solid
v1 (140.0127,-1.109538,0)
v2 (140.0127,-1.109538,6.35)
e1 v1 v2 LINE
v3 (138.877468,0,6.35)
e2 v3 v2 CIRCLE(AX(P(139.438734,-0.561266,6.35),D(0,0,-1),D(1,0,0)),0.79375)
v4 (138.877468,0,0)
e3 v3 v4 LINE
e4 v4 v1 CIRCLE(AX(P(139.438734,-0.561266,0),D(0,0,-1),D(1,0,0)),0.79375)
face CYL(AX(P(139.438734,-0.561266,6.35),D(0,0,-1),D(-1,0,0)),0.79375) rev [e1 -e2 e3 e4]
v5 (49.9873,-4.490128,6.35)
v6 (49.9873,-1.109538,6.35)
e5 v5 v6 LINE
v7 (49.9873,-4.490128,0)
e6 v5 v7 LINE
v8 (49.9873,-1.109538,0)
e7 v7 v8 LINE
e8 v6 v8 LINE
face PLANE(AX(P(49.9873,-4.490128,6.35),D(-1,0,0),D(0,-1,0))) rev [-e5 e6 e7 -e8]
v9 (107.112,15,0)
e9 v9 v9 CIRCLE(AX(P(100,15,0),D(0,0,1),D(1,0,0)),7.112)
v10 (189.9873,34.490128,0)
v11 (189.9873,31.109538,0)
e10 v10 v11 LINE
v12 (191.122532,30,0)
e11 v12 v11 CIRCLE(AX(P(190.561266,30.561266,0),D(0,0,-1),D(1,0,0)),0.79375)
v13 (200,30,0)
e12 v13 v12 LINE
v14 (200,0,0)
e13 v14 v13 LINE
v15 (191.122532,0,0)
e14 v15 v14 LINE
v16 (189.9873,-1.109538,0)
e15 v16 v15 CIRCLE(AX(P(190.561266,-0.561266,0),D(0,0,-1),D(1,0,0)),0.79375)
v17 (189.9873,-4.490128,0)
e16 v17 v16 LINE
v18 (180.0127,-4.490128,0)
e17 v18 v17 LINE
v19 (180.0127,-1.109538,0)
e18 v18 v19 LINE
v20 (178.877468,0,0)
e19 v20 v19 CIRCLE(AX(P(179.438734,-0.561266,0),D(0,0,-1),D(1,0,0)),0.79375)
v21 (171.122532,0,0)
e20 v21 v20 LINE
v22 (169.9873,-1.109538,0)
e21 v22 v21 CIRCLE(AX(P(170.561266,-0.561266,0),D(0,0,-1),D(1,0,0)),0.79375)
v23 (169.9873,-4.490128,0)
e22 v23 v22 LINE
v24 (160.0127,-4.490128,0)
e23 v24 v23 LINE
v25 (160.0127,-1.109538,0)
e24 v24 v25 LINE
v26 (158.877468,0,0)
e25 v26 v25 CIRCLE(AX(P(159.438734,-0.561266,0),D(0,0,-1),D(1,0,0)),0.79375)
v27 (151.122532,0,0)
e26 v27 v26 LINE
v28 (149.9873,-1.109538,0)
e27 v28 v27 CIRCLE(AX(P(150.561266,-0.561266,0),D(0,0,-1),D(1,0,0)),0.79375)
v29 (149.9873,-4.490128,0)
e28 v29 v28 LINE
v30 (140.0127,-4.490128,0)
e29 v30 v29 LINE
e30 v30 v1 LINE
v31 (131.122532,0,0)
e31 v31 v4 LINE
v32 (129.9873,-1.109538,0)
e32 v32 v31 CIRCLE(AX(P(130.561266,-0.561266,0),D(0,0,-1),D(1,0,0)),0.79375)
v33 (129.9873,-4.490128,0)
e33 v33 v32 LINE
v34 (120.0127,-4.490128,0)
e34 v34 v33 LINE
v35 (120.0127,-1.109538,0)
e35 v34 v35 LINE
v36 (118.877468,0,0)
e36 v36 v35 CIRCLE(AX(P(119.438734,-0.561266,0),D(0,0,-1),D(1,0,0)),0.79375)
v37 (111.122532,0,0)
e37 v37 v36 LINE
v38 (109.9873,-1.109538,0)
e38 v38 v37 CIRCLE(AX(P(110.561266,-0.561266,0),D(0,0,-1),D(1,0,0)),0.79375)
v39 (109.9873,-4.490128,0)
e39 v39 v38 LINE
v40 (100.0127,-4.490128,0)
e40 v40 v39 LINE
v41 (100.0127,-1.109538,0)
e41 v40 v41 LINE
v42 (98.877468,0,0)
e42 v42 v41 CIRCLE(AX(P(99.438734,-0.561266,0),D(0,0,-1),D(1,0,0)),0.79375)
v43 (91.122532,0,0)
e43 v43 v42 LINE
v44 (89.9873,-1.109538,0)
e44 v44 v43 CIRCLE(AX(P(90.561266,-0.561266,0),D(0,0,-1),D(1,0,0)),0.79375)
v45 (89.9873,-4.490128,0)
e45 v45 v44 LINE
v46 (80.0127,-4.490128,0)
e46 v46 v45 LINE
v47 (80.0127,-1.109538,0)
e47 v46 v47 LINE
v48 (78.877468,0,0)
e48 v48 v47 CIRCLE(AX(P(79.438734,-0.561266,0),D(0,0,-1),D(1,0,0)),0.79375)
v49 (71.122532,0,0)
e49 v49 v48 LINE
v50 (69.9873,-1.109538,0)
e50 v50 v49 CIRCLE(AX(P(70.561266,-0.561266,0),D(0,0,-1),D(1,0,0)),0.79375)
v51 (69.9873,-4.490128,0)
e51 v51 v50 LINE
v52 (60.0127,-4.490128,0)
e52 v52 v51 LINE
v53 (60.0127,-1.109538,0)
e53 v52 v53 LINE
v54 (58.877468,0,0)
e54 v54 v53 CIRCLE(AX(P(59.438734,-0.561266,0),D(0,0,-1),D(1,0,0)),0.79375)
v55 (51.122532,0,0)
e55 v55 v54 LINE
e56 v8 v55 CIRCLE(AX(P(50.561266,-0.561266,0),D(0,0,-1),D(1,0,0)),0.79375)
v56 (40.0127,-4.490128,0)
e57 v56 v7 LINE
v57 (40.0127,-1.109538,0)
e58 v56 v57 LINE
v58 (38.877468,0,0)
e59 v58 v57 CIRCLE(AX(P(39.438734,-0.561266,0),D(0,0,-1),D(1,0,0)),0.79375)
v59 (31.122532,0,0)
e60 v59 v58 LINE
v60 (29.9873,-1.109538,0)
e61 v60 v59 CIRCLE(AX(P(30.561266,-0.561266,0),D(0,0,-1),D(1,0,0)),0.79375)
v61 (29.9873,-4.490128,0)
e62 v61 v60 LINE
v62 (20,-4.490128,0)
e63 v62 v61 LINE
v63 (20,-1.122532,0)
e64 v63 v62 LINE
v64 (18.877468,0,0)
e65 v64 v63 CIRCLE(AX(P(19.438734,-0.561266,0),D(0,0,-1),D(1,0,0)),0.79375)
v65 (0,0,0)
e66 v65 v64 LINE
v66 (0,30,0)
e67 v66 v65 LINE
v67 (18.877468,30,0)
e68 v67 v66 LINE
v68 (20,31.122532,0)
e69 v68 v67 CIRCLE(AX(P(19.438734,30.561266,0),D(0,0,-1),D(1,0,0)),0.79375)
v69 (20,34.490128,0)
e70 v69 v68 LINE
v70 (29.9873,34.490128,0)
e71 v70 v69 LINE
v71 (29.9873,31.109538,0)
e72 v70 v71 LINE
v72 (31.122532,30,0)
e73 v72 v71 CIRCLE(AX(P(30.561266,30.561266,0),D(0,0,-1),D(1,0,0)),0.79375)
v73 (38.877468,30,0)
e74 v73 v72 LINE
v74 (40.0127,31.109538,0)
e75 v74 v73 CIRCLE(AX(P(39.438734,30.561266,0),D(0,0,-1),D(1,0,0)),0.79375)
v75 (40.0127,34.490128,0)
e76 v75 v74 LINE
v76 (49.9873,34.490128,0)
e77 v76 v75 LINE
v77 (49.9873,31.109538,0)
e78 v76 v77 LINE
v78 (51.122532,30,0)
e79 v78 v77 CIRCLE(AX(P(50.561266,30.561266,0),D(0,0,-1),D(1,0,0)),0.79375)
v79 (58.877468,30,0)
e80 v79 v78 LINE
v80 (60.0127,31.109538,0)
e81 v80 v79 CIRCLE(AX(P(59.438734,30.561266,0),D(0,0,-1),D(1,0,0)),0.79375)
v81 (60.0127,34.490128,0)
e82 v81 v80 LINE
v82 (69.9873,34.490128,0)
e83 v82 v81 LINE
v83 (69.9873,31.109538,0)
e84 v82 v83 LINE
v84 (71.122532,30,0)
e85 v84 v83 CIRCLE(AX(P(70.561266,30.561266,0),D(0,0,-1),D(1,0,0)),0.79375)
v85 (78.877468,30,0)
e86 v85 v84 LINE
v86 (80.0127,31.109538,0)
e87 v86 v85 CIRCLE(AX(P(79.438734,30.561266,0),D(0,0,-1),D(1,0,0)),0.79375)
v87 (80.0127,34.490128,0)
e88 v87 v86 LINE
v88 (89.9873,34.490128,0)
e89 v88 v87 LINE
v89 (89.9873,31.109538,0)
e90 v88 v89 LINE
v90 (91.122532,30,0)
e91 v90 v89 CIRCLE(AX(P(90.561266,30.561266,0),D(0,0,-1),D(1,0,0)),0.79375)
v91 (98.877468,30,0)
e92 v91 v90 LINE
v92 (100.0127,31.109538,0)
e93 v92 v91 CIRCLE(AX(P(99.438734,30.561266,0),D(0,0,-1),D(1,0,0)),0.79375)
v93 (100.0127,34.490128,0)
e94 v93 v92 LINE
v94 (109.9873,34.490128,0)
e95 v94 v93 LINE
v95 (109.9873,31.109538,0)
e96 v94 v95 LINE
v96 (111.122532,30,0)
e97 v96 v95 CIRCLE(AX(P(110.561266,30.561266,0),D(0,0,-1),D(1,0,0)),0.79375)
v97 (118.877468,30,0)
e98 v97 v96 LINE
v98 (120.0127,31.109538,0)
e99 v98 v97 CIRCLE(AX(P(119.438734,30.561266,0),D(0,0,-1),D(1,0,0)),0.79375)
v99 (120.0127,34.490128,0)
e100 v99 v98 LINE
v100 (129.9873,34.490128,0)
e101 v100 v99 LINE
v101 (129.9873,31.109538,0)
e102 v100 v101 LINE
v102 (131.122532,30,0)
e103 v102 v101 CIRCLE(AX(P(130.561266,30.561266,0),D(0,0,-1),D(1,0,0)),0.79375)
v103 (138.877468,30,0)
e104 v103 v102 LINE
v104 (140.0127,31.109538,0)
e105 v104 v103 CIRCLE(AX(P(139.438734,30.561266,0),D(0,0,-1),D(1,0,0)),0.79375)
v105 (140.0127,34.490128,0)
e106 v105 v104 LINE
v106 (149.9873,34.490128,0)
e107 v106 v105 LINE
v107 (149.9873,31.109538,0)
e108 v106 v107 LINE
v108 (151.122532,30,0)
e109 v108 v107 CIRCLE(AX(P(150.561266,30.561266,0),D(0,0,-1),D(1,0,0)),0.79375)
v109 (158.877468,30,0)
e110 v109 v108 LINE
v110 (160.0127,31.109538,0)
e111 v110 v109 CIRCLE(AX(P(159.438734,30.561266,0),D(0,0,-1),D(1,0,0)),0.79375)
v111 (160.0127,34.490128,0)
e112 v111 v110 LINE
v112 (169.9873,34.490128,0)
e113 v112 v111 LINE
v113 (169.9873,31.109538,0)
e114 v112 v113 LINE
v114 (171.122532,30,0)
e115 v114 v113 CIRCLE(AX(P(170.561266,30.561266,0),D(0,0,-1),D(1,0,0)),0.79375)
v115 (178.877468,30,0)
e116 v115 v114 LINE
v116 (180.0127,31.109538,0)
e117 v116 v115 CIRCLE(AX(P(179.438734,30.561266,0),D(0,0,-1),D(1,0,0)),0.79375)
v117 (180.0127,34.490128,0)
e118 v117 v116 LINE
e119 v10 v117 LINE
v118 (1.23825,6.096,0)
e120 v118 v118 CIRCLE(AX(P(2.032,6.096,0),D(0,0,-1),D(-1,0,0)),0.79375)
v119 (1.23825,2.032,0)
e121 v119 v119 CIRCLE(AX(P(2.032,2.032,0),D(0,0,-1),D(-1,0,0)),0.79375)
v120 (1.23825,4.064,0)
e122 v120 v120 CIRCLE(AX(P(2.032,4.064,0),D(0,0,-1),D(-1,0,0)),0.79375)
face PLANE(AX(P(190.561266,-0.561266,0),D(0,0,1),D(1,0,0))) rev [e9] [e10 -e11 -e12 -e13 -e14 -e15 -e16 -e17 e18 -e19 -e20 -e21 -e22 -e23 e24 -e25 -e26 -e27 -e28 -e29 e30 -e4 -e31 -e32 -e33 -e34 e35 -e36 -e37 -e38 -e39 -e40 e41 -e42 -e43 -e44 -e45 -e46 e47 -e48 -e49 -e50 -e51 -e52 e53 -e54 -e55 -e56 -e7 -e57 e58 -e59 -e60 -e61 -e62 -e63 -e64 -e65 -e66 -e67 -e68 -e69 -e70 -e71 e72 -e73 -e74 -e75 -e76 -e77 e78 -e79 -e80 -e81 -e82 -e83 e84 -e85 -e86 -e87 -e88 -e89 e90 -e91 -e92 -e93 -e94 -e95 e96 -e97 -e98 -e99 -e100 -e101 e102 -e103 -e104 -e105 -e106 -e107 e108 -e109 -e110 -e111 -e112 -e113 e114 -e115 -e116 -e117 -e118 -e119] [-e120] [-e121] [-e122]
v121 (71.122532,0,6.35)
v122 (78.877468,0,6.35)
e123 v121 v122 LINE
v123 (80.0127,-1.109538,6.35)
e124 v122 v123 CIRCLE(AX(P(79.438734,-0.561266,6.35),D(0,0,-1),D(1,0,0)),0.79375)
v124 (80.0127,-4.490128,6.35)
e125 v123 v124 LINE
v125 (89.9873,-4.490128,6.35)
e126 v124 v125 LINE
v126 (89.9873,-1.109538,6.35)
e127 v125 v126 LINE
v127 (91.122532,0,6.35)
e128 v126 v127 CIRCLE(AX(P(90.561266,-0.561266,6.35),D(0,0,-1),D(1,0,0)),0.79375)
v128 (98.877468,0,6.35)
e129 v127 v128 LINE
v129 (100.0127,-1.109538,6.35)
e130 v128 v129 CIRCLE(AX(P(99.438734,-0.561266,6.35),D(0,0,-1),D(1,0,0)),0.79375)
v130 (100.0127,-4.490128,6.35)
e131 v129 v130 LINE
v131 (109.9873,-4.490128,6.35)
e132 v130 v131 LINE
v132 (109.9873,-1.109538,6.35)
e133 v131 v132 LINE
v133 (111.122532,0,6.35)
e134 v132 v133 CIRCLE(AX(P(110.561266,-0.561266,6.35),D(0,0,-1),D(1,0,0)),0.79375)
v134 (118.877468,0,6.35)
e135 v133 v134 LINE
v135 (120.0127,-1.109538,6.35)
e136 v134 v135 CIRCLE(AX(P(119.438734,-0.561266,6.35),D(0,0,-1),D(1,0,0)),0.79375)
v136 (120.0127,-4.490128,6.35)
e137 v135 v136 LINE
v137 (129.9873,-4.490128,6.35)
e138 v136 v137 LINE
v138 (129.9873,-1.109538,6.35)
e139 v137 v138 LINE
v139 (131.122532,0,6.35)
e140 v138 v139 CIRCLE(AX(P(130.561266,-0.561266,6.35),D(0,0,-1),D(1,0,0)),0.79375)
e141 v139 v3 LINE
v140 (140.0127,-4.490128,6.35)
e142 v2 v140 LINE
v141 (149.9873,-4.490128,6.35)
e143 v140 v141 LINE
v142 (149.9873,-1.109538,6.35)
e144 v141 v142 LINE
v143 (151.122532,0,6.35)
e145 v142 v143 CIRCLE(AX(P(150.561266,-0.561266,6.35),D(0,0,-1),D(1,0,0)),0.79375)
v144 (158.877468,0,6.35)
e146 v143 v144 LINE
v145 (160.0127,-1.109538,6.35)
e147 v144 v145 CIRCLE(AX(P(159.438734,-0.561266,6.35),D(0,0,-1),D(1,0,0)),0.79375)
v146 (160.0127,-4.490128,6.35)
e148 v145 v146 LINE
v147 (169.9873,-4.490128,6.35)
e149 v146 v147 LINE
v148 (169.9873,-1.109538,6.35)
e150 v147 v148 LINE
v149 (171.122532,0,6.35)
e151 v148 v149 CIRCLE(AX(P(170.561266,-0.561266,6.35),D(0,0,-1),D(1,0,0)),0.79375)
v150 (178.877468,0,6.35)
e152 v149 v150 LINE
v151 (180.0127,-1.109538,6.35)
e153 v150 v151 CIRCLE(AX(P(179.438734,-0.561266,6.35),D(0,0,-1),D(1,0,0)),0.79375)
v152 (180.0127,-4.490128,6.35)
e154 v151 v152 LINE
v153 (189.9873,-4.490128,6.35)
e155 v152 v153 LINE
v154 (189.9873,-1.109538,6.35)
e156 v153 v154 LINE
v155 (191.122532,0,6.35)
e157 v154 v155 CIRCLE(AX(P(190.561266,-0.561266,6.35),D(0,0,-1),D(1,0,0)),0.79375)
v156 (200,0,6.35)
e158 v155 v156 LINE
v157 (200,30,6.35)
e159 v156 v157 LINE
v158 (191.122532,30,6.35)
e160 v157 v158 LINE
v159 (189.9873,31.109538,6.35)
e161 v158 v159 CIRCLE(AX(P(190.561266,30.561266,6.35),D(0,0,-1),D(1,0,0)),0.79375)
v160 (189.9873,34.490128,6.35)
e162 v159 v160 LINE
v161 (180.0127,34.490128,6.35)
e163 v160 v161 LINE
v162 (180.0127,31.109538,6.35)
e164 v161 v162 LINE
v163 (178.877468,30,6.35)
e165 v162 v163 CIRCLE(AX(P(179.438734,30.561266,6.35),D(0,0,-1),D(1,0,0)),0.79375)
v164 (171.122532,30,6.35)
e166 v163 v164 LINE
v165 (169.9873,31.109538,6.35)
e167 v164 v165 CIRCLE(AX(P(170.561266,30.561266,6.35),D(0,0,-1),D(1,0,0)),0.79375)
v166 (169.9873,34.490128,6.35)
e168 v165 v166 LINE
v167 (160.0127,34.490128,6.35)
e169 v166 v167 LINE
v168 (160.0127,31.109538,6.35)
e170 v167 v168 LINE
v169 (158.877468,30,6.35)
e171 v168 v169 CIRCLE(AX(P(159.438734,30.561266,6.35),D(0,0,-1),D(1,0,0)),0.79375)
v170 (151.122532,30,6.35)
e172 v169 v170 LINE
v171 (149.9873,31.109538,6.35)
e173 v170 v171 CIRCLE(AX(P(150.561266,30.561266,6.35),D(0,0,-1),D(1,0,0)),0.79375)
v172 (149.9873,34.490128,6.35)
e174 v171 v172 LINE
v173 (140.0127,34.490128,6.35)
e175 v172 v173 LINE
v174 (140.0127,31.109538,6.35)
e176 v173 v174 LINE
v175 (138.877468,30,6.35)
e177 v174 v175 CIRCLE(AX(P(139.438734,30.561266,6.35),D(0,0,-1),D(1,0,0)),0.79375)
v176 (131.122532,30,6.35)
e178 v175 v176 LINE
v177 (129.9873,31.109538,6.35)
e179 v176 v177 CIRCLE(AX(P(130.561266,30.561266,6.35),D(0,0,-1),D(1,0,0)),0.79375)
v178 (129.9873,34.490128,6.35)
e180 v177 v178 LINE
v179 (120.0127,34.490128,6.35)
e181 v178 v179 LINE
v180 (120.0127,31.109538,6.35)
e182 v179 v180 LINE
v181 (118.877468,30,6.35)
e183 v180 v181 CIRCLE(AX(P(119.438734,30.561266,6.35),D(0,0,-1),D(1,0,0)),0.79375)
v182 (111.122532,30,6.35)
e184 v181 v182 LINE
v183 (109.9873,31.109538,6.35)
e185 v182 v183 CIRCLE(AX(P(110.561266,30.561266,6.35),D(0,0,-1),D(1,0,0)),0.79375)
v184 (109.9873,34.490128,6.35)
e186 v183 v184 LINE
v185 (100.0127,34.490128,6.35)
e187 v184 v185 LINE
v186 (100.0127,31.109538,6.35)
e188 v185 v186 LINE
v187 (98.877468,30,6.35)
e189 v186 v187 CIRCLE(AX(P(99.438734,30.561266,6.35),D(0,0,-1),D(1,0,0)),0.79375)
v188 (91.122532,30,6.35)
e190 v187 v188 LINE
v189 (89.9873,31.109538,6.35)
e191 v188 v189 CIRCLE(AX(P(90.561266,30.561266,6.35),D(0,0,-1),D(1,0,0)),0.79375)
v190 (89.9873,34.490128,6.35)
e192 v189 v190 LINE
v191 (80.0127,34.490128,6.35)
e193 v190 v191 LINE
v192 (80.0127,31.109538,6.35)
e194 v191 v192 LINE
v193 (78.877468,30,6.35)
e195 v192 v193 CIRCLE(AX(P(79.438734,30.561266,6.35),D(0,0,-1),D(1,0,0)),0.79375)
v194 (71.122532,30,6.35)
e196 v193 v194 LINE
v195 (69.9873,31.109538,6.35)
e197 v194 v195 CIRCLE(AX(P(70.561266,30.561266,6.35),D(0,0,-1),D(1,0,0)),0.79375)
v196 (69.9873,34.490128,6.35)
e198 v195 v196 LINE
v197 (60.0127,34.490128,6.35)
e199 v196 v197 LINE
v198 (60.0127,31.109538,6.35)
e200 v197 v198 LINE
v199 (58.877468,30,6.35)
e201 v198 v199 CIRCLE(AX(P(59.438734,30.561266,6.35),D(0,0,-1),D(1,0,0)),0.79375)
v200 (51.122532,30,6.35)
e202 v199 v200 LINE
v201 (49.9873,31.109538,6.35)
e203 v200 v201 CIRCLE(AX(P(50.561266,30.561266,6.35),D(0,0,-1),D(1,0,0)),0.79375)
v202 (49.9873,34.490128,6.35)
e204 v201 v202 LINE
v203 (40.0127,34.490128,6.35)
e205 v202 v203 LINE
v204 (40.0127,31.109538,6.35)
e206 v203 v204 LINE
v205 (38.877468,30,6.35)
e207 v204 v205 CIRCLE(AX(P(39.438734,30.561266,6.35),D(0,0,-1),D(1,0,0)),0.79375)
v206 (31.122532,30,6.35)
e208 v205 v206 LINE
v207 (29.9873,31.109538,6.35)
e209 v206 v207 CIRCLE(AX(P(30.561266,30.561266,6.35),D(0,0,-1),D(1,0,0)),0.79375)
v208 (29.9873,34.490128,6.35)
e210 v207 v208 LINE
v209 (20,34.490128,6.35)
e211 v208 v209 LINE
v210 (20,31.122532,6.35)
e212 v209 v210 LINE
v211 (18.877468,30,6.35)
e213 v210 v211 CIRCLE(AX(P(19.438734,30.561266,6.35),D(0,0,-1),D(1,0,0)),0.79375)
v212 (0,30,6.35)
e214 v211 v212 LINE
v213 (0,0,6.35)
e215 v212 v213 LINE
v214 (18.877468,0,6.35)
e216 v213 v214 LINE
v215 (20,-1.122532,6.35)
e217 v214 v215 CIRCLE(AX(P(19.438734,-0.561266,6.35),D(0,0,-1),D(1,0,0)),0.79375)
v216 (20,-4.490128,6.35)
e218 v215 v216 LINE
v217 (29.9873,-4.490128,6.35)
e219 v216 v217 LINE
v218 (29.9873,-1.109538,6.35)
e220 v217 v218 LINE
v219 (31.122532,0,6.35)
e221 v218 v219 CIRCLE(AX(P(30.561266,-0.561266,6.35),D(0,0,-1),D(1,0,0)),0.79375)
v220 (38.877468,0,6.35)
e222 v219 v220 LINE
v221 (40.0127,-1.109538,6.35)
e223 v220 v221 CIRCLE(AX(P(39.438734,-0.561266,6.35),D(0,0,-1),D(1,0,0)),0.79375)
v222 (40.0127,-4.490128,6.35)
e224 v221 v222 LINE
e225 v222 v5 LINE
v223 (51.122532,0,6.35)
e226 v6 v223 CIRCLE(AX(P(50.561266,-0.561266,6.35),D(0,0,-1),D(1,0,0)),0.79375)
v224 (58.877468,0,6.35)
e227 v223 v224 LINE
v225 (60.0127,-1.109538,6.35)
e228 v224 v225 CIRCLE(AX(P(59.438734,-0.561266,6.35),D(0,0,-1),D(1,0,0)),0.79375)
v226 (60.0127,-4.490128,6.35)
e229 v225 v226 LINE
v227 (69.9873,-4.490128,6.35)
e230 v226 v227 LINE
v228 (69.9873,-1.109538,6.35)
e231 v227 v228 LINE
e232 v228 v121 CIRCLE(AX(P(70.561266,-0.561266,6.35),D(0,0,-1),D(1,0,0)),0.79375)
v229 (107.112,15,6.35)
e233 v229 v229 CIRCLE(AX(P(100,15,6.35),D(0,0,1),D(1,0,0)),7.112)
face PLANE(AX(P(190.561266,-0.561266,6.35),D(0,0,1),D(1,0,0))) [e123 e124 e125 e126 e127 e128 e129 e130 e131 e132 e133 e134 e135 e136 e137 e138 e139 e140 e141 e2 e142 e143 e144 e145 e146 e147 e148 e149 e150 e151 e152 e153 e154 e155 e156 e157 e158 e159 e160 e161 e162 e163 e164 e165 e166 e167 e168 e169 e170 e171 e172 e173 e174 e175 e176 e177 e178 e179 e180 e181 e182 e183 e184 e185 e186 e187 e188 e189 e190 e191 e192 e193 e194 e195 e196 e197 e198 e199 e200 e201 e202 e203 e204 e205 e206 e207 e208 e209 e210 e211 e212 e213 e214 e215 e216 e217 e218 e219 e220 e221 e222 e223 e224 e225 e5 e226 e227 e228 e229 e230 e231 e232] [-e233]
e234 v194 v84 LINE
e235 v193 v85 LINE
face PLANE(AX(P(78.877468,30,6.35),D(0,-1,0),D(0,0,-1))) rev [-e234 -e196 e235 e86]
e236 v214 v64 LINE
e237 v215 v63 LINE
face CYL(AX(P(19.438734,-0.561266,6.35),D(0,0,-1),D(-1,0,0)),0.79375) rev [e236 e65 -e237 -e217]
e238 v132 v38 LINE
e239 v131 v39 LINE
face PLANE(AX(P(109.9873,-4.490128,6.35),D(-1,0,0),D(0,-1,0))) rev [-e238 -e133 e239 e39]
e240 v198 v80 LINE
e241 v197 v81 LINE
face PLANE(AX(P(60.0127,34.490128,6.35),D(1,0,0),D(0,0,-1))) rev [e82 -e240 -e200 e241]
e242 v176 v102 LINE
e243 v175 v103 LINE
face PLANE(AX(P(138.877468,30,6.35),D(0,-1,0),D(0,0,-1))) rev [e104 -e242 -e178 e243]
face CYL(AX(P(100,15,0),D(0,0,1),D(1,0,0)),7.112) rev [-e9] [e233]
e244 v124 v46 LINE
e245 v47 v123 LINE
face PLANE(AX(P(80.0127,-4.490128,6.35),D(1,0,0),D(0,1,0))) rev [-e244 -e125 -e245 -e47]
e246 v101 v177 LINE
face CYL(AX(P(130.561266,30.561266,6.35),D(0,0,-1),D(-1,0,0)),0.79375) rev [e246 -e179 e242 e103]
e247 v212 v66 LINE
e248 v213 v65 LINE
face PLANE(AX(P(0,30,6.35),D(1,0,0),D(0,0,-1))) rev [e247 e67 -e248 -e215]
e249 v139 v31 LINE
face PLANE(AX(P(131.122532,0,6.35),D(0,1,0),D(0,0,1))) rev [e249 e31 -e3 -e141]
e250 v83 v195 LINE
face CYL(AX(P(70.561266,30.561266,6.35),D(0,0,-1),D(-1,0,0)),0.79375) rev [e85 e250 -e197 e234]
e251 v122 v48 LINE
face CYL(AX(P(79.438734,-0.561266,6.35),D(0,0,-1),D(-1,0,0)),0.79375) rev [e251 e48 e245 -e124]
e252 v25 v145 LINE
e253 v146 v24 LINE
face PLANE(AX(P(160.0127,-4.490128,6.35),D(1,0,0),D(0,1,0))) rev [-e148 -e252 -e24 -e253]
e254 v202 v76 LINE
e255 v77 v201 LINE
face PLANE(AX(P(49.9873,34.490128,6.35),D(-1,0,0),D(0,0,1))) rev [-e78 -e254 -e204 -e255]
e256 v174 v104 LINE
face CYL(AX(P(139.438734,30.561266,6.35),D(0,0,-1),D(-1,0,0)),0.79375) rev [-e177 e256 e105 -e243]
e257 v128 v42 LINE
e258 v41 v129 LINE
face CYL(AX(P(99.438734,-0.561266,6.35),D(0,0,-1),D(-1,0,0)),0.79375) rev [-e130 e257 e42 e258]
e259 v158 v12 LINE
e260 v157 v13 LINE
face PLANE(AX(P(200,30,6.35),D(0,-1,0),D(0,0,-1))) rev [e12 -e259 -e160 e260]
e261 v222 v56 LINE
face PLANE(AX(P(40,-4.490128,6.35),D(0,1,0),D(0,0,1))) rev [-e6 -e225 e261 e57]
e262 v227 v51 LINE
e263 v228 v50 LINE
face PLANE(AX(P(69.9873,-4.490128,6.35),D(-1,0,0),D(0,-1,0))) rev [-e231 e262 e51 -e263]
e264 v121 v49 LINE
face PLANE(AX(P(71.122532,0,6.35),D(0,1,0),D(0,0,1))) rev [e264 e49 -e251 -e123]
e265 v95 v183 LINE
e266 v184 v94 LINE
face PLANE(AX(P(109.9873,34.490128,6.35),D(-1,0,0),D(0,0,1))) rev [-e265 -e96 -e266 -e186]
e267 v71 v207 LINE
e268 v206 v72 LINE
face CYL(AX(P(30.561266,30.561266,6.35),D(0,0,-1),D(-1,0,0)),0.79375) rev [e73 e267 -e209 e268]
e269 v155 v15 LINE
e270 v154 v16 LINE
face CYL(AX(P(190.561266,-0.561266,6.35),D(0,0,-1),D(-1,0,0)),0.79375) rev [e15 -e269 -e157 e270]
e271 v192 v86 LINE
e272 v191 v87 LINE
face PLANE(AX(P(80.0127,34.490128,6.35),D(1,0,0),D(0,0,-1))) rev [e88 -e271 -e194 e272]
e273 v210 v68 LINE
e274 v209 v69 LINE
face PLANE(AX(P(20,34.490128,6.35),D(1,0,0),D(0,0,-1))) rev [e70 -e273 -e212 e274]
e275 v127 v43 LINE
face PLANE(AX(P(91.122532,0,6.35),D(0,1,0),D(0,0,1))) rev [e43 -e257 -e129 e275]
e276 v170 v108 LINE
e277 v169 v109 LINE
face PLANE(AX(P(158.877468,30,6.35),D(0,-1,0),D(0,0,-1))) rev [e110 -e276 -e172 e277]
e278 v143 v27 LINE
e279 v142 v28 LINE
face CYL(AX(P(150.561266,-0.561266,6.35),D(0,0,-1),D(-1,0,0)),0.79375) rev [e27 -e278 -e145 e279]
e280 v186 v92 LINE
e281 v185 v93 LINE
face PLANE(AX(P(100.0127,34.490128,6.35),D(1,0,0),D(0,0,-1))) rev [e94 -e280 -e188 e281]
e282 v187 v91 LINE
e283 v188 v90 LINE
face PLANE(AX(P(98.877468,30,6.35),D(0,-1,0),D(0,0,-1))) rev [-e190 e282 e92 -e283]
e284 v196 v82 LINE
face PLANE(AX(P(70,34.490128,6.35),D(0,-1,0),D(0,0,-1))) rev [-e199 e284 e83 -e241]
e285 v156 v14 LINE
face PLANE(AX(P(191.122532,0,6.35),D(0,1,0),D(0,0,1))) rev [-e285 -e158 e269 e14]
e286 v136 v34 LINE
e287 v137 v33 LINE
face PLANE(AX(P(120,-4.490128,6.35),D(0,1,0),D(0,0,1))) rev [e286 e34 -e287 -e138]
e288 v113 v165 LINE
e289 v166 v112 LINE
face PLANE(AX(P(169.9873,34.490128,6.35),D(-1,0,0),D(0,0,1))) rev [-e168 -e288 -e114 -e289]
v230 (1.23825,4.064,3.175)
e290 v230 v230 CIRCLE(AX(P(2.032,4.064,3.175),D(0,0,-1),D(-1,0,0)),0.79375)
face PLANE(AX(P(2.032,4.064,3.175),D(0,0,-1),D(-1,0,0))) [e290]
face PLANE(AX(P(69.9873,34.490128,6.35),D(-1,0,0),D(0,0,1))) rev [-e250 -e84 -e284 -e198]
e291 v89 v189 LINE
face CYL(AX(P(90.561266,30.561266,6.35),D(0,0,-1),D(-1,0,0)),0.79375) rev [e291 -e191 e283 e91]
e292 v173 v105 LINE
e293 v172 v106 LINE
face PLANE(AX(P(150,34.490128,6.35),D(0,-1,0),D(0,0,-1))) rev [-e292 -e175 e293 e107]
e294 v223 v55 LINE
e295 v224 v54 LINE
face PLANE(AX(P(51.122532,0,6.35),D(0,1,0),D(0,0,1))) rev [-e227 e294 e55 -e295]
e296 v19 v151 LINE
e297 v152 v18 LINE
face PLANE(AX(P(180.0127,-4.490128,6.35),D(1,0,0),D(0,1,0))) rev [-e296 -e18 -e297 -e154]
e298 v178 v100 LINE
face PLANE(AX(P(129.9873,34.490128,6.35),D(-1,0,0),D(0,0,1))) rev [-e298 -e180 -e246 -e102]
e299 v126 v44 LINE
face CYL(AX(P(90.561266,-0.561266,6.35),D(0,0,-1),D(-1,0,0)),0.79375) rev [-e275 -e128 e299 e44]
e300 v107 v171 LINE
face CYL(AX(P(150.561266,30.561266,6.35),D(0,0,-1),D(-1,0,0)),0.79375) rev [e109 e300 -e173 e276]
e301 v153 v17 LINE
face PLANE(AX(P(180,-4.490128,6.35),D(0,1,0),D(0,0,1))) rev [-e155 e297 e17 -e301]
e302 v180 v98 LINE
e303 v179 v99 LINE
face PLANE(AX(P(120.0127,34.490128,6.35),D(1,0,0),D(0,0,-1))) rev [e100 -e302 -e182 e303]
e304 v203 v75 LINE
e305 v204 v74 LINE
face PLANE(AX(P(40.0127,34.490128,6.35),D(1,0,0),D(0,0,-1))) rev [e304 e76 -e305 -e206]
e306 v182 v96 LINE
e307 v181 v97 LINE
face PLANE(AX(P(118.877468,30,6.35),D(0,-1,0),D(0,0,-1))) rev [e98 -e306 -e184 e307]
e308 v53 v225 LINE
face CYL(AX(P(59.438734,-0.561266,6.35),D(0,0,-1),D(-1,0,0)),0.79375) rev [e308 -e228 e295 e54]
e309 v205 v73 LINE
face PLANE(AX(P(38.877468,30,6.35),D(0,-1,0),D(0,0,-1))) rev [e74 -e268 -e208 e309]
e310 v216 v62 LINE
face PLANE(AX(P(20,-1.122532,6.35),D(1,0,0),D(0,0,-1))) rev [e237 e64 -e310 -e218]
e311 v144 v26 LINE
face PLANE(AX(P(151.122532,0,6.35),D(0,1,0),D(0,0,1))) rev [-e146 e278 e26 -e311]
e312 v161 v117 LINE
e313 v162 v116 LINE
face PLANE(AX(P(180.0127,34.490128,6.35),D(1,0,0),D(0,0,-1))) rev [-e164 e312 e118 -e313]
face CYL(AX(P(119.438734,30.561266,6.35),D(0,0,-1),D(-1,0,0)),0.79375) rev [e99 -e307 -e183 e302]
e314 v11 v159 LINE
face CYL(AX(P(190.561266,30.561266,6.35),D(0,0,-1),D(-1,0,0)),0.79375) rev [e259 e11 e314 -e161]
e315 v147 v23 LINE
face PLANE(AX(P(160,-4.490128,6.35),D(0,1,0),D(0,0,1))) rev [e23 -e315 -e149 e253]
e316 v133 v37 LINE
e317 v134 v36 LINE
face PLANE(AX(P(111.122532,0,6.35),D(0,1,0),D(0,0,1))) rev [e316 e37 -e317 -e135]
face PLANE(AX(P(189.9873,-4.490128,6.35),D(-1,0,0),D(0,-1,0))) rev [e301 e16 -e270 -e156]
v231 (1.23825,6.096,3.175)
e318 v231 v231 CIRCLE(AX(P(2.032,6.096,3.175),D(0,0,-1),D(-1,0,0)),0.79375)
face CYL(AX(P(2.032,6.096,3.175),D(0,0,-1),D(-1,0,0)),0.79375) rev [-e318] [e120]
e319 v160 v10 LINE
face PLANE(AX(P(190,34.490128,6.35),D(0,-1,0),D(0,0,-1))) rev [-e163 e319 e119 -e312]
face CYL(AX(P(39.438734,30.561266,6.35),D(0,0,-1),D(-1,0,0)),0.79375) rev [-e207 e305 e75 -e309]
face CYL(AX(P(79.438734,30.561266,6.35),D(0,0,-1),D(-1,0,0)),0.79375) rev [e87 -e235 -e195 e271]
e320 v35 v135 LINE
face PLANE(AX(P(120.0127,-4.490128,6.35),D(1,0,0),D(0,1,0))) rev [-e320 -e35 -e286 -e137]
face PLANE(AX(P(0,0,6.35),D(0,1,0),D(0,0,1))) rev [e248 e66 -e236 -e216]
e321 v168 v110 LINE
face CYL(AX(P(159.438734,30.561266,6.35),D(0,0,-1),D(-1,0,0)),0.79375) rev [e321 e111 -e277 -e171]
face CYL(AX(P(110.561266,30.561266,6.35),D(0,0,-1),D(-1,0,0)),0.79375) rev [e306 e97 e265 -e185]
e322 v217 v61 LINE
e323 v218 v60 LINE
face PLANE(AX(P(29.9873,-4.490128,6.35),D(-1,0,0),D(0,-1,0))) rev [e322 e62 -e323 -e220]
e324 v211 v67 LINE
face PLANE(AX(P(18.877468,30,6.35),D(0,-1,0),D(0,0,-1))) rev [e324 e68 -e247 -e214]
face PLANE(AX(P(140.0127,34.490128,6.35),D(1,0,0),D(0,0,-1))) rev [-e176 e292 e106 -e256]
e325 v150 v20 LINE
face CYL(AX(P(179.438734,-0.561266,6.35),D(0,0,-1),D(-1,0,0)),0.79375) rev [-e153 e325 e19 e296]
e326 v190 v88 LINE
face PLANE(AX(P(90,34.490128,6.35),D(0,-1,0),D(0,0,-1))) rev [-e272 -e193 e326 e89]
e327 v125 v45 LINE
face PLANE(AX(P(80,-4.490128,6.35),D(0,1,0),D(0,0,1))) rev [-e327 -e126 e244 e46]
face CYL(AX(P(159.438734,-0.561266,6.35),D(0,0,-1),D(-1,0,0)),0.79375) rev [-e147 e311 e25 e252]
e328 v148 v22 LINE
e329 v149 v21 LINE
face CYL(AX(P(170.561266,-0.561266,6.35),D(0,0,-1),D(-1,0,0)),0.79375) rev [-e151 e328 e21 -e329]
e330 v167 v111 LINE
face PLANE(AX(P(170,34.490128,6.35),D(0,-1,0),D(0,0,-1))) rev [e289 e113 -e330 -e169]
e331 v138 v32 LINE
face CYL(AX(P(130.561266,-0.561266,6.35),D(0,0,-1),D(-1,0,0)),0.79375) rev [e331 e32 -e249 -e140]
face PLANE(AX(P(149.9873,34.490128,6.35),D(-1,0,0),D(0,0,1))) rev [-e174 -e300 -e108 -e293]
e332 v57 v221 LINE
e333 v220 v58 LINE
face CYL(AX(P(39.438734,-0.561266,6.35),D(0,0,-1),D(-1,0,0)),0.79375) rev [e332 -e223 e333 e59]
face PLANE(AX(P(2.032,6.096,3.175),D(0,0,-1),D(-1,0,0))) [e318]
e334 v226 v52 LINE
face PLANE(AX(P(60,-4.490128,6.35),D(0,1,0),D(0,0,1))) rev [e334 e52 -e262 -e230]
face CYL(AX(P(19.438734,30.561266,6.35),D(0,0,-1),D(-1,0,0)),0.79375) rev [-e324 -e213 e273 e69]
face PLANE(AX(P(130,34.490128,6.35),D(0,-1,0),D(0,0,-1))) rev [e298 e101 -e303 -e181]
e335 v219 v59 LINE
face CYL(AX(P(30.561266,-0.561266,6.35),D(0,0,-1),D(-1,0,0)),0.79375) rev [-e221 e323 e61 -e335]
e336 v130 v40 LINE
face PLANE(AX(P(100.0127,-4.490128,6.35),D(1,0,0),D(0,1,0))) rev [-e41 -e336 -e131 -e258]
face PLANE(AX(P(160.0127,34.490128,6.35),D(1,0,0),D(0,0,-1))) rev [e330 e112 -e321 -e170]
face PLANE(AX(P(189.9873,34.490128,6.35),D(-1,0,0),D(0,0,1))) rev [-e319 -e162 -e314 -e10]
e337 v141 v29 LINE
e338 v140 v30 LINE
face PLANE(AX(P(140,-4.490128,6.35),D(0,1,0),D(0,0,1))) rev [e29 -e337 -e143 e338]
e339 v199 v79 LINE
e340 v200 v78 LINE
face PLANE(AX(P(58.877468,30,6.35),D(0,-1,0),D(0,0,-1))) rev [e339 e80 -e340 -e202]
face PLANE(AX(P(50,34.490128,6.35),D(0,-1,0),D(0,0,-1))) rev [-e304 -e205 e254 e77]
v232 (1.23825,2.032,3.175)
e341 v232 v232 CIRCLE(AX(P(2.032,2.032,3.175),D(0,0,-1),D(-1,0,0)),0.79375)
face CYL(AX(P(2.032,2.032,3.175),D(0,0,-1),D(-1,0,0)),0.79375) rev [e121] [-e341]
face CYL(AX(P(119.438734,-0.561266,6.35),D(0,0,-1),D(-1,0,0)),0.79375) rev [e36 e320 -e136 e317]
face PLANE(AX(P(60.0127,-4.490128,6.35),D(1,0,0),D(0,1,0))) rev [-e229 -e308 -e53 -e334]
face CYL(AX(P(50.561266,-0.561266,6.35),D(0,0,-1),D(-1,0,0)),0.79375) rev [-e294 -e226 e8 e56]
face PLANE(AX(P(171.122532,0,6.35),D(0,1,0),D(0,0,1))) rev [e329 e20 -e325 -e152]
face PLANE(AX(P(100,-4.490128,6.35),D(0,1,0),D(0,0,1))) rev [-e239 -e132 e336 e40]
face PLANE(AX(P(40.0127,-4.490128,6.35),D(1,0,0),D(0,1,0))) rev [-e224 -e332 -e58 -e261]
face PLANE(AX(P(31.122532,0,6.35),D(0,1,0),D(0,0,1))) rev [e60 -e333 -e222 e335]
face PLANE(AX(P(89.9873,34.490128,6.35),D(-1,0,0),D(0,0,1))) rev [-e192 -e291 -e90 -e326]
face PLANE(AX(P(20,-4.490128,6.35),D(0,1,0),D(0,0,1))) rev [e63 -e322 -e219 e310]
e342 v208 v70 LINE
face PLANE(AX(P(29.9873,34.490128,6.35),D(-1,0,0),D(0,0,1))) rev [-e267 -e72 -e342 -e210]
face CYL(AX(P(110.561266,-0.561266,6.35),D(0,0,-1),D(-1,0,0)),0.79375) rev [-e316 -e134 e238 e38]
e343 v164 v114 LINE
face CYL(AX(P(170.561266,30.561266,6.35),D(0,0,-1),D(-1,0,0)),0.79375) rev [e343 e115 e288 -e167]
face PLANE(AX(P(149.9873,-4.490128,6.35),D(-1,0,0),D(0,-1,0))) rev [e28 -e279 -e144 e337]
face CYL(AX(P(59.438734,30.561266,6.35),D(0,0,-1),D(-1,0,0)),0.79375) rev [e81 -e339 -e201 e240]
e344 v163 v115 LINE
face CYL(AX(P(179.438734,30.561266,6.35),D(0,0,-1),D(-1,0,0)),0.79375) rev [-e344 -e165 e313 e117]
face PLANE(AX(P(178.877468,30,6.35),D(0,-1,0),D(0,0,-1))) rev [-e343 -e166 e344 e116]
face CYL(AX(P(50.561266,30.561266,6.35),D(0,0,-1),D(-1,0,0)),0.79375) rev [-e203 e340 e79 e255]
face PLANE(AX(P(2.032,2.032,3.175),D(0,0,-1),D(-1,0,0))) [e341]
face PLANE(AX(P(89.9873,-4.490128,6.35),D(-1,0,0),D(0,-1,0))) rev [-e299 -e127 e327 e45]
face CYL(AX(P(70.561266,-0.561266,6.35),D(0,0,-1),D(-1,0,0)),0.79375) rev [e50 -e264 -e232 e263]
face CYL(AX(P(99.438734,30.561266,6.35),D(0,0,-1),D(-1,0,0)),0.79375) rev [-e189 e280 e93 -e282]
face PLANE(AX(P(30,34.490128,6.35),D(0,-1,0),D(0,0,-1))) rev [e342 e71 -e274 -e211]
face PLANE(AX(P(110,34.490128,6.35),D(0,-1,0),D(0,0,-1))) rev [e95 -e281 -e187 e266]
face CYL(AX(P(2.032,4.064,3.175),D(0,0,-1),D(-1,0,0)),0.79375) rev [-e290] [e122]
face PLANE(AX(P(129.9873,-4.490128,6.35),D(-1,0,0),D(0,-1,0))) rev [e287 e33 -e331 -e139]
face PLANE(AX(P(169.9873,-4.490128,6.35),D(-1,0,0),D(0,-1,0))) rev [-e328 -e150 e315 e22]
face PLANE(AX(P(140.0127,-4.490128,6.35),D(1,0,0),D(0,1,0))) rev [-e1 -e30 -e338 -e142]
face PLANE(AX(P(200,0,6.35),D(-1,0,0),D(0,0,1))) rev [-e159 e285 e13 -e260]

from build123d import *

# Parameters (mm, degrees)
BOSS_EXTRUDE1_DEPTH = 6.35
SKETCH1_R           = 7.112
CUT_EXTRUDE1_DEPTH  = 6.35
SKETCH2_W           = 10.0254
SKETCH2_H           = 4.477133961
CUT_EXTRUDE2_DEPTH  = 204.051450213
LPATTERN1_COUNT     = 9
LPATTERN1_PITCH     = 20
SKETCH5_R           = 0.79375
CUT_EXTRUDE4_DEPTH  = 3.175
LPATTERN2_COUNT     = 3
LPATTERN2_PITCH     = 2.032


# Read off the part's stored shape, not the designer's step: Boss-Extrude1
with BuildPart() as part:
    # Boss-Extrude1 outline → Boss-Extrude1 (new body)
    with BuildSketch(Plane.XY):
        with BuildLine():
            Line((190, -4.490128061), (190, -1.122532015))
            ThreePointArc((190, -1.122532015), (190, 0), (191.122532015, 0))
            Line((191.122532015, 0), (200, 0))
            Line((200, 0), (200, 30))
            Line((200, 30), (191.122532015, 30))
            ThreePointArc((191.122532015, 30), (190, 30), (190, 31.122532015))
            Line((190, 31.122532015), (190, 34.490128061))
            Line((190, 34.490128061), (180, 34.490128061))
            Line((180, 34.490128061), (180, 31.122532015))
            ThreePointArc((180, 31.122532015), (180, 30), (178.877467985, 30))
            Line((178.877467985, 30), (171.122532015, 30))
            ThreePointArc((171.122532015, 30), (170, 30), (170, 31.122532015))
            Line((170, 31.122532015), (170, 34.490128061))
            Line((170, 34.490128061), (160, 34.490128061))
            Line((160, 34.490128061), (160, 31.122532015))
            ThreePointArc((160, 31.122532015), (160, 30), (158.877467985, 30))
            Line((158.877467985, 30), (151.122532015, 30))
            ThreePointArc((151.122532015, 30), (150, 30), (150, 31.122532015))
            Line((150, 31.122532015), (150, 34.490128061))
            Line((150, 34.490128061), (140, 34.490128061))
            Line((140, 34.490128061), (140, 31.122532015))
            ThreePointArc((140, 31.122532015), (140, 30), (138.877467985, 30))
            Line((138.877467985, 30), (131.122532015, 30))
            ThreePointArc((131.122532015, 30), (130, 30), (130, 31.122532015))
            Line((130, 31.122532015), (130, 34.490128061))
            Line((130, 34.490128061), (120, 34.490128061))
            Line((120, 34.490128061), (120, 31.122532015))
            ThreePointArc((120, 31.122532015), (120, 30), (118.877467985, 30))
            Line((118.877467985, 30), (111.122532015, 30))
            ThreePointArc((111.122532015, 30), (110, 30), (110, 31.122532015))
            Line((110, 31.122532015), (110, 34.490128061))
            Line((110, 34.490128061), (100, 34.490128061))
            Line((100, 34.490128061), (100, 31.122532015))
            ThreePointArc((100, 31.122532015), (100, 30), (98.877467985, 30))
            Line((98.877467985, 30), (91.122532015, 30))
            ThreePointArc((91.122532015, 30), (90, 30), (90, 31.122532015))
            Line((90, 31.122532015), (90, 34.490128061))
            Line((90, 34.490128061), (80, 34.490128061))
            Line((80, 34.490128061), (80, 31.122532015))
            ThreePointArc((80, 31.122532015), (80, 30), (78.877467985, 30))
            Line((78.877467985, 30), (71.122532015, 30))
            ThreePointArc((71.122532015, 30), (70, 30), (70, 31.122532015))
            Line((70, 31.122532015), (70, 34.490128061))
            Line((70, 34.490128061), (60, 34.490128061))
            Line((60, 34.490128061), (60, 31.122532015))
            ThreePointArc((60, 31.122532015), (60, 30), (58.877467985, 30))
            Line((58.877467985, 30), (51.122532015, 30))
            ThreePointArc((51.122532015, 30), (50, 30), (50, 31.122532015))
            Line((50, 31.122532015), (50, 34.490128061))
            Line((50, 34.490128061), (40, 34.490128061))
            Line((40, 34.490128061), (40, 31.122532015))
            ThreePointArc((40, 31.122532015), (40, 30), (38.877467985, 30))
            Line((38.877467985, 30), (31.122532015, 30))
            ThreePointArc((31.122532015, 30), (30, 30), (30, 31.122532015))
            Line((30, 31.122532015), (30, 34.490128061))
            Line((30, 34.490128061), (20, 34.490128061))
            Line((20, 34.490128061), (20, 31.122532015))
            ThreePointArc((20, 31.122532015), (20, 30), (18.877467985, 30))
            Line((18.877467985, 30), (0, 30))
            Line((0, 30), (0, 0))
            Line((0, 0), (18.877467985, 0))
            ThreePointArc((18.877467985, 0), (20, 0), (20, -1.122532015))
            Line((20, -1.122532015), (20, -4.490128061))
            Line((20, -4.490128061), (30, -4.490128061))
            Line((30, -4.490128061), (30, -1.122532015))
            ThreePointArc((30, -1.122532015), (30, 0), (31.122532015, 0))
            Line((31.122532015, 0), (38.877467985, 0))
            ThreePointArc((38.877467985, 0), (40, 0), (40, -1.122532015))
            Line((40, -1.122532015), (40, -4.490128061))
            Line((40, -4.490128061), (50, -4.490128061))
            Line((50, -4.490128061), (50, -1.122532015))
            ThreePointArc((50, -1.122532015), (50, 0), (51.122532015, 0))
            Line((51.122532015, 0), (58.877467985, 0))
            ThreePointArc((58.877467985, 0), (60, 0), (60, -1.122532015))
            Line((60, -1.122532015), (60, -4.490128061))
            Line((60, -4.490128061), (70, -4.490128061))
            Line((70, -4.490128061), (70, -1.122532015))
            ThreePointArc((70, -1.122532015), (70, 0), (71.122532015, 0))
            Line((71.122532015, 0), (78.877467985, 0))
            ThreePointArc((78.877467985, 0), (80, 0), (80, -1.122532015))
            Line((80, -1.122532015), (80, -4.490128061))
            Line((80, -4.490128061), (90, -4.490128061))
            Line((90, -4.490128061), (90, -1.122532015))
            ThreePointArc((90, -1.122532015), (90, 0), (91.122532015, 0))
            Line((91.122532015, 0), (98.877467985, 0))
            ThreePointArc((98.877467985, 0), (100, 0), (100, -1.122532015))
            Line((100, -1.122532015), (100, -4.490128061))
            Line((100, -4.490128061), (110, -4.490128061))
            Line((110, -4.490128061), (110, -1.122532015))
            ThreePointArc((110, -1.122532015), (110, 0), (111.122532015, 0))
            Line((111.122532015, 0), (118.877467985, 0))
            ThreePointArc((118.877467985, 0), (120, 0), (120, -1.122532015))
            Line((120, -1.122532015), (120, -4.490128061))
            Line((120, -4.490128061), (130, -4.490128061))
            Line((130, -4.490128061), (130, -1.122532015))
            ThreePointArc((130, -1.122532015), (130, 0), (131.122532015, 0))
            Line((131.122532015, 0), (138.877467985, 0))
            ThreePointArc((138.877467985, 0), (140, 0), (140, -1.122532015))
            Line((140, -1.122532015), (140, -4.490128061))
            Line((140, -4.490128061), (150, -4.490128061))
            Line((150, -4.490128061), (150, -1.122532015))
            ThreePointArc((150, -1.122532015), (150, 0), (151.122532015, 0))
            Line((151.122532015, 0), (158.877467985, 0))
            ThreePointArc((158.877467985, 0), (160, 0), (160, -1.122532015))
            Line((160, -1.122532015), (160, -4.490128061))
            Line((160, -4.490128061), (170, -4.490128061))
            Line((170, -4.490128061), (170, -1.122532015))
            ThreePointArc((170, -1.122532015), (170, 0), (171.122532015, 0))
            Line((171.122532015, 0), (178.877467985, 0))
            ThreePointArc((178.877467985, 0), (180, 0), (180, -1.122532015))
            Line((180, -1.122532015), (180, -4.490128061))
            Line((180, -4.490128061), (190, -4.490128061))
        make_face()
    extrude(amount=BOSS_EXTRUDE1_DEPTH)

    # Sketch1 → Cut-Extrude1 (cut)
    with BuildSketch(Plane.XY.offset(6.35)):
        with Locations((100, 15)):
            Circle(SKETCH1_R)
    extrude(amount=-CUT_EXTRUDE1_DEPTH, mode=Mode.SUBTRACT)

    # Sketch2 → Cut-Extrude2 (cut, through all)
    with BuildSketch(Plane(origin=(0, 0, 0), x_dir=(-1, 0, 0), z_dir=(0, 0, -1))):
        with Locations((-35, 32.25156108)):
            Rectangle(SKETCH2_W, SKETCH2_H)
        with Locations((-35, -2.251561081)):
            Rectangle(SKETCH2_W, SKETCH2_H)
    cut_extrude2 = extrude(amount=-CUT_EXTRUDE2_DEPTH, mode=Mode.SUBTRACT)

    # LPattern1: Cut-Extrude2 ×9
    with Locations(*[(i * LPATTERN1_PITCH, 0, 0) for i in range(1, LPATTERN1_COUNT)]):
        add(cut_extrude2, mode=Mode.SUBTRACT)

    # Sketch5 → Cut-Extrude4 (cut)
    with BuildSketch(Plane(origin=(0, 0, 0), x_dir=(-1, 0, 0), z_dir=(0, 0, -1))):
        with Locations((-2.032, 2.032)):
            Circle(SKETCH5_R)
    cut_extrude4 = extrude(amount=-CUT_EXTRUDE4_DEPTH, mode=Mode.SUBTRACT)

    # LPattern2: Cut-Extrude4 ×3
    with Locations(*[(0, i * LPATTERN2_PITCH, 0) for i in range(1, LPATTERN2_COUNT)]):
        add(cut_extrude4, mode=Mode.SUBTRACT)


solid = part.part
